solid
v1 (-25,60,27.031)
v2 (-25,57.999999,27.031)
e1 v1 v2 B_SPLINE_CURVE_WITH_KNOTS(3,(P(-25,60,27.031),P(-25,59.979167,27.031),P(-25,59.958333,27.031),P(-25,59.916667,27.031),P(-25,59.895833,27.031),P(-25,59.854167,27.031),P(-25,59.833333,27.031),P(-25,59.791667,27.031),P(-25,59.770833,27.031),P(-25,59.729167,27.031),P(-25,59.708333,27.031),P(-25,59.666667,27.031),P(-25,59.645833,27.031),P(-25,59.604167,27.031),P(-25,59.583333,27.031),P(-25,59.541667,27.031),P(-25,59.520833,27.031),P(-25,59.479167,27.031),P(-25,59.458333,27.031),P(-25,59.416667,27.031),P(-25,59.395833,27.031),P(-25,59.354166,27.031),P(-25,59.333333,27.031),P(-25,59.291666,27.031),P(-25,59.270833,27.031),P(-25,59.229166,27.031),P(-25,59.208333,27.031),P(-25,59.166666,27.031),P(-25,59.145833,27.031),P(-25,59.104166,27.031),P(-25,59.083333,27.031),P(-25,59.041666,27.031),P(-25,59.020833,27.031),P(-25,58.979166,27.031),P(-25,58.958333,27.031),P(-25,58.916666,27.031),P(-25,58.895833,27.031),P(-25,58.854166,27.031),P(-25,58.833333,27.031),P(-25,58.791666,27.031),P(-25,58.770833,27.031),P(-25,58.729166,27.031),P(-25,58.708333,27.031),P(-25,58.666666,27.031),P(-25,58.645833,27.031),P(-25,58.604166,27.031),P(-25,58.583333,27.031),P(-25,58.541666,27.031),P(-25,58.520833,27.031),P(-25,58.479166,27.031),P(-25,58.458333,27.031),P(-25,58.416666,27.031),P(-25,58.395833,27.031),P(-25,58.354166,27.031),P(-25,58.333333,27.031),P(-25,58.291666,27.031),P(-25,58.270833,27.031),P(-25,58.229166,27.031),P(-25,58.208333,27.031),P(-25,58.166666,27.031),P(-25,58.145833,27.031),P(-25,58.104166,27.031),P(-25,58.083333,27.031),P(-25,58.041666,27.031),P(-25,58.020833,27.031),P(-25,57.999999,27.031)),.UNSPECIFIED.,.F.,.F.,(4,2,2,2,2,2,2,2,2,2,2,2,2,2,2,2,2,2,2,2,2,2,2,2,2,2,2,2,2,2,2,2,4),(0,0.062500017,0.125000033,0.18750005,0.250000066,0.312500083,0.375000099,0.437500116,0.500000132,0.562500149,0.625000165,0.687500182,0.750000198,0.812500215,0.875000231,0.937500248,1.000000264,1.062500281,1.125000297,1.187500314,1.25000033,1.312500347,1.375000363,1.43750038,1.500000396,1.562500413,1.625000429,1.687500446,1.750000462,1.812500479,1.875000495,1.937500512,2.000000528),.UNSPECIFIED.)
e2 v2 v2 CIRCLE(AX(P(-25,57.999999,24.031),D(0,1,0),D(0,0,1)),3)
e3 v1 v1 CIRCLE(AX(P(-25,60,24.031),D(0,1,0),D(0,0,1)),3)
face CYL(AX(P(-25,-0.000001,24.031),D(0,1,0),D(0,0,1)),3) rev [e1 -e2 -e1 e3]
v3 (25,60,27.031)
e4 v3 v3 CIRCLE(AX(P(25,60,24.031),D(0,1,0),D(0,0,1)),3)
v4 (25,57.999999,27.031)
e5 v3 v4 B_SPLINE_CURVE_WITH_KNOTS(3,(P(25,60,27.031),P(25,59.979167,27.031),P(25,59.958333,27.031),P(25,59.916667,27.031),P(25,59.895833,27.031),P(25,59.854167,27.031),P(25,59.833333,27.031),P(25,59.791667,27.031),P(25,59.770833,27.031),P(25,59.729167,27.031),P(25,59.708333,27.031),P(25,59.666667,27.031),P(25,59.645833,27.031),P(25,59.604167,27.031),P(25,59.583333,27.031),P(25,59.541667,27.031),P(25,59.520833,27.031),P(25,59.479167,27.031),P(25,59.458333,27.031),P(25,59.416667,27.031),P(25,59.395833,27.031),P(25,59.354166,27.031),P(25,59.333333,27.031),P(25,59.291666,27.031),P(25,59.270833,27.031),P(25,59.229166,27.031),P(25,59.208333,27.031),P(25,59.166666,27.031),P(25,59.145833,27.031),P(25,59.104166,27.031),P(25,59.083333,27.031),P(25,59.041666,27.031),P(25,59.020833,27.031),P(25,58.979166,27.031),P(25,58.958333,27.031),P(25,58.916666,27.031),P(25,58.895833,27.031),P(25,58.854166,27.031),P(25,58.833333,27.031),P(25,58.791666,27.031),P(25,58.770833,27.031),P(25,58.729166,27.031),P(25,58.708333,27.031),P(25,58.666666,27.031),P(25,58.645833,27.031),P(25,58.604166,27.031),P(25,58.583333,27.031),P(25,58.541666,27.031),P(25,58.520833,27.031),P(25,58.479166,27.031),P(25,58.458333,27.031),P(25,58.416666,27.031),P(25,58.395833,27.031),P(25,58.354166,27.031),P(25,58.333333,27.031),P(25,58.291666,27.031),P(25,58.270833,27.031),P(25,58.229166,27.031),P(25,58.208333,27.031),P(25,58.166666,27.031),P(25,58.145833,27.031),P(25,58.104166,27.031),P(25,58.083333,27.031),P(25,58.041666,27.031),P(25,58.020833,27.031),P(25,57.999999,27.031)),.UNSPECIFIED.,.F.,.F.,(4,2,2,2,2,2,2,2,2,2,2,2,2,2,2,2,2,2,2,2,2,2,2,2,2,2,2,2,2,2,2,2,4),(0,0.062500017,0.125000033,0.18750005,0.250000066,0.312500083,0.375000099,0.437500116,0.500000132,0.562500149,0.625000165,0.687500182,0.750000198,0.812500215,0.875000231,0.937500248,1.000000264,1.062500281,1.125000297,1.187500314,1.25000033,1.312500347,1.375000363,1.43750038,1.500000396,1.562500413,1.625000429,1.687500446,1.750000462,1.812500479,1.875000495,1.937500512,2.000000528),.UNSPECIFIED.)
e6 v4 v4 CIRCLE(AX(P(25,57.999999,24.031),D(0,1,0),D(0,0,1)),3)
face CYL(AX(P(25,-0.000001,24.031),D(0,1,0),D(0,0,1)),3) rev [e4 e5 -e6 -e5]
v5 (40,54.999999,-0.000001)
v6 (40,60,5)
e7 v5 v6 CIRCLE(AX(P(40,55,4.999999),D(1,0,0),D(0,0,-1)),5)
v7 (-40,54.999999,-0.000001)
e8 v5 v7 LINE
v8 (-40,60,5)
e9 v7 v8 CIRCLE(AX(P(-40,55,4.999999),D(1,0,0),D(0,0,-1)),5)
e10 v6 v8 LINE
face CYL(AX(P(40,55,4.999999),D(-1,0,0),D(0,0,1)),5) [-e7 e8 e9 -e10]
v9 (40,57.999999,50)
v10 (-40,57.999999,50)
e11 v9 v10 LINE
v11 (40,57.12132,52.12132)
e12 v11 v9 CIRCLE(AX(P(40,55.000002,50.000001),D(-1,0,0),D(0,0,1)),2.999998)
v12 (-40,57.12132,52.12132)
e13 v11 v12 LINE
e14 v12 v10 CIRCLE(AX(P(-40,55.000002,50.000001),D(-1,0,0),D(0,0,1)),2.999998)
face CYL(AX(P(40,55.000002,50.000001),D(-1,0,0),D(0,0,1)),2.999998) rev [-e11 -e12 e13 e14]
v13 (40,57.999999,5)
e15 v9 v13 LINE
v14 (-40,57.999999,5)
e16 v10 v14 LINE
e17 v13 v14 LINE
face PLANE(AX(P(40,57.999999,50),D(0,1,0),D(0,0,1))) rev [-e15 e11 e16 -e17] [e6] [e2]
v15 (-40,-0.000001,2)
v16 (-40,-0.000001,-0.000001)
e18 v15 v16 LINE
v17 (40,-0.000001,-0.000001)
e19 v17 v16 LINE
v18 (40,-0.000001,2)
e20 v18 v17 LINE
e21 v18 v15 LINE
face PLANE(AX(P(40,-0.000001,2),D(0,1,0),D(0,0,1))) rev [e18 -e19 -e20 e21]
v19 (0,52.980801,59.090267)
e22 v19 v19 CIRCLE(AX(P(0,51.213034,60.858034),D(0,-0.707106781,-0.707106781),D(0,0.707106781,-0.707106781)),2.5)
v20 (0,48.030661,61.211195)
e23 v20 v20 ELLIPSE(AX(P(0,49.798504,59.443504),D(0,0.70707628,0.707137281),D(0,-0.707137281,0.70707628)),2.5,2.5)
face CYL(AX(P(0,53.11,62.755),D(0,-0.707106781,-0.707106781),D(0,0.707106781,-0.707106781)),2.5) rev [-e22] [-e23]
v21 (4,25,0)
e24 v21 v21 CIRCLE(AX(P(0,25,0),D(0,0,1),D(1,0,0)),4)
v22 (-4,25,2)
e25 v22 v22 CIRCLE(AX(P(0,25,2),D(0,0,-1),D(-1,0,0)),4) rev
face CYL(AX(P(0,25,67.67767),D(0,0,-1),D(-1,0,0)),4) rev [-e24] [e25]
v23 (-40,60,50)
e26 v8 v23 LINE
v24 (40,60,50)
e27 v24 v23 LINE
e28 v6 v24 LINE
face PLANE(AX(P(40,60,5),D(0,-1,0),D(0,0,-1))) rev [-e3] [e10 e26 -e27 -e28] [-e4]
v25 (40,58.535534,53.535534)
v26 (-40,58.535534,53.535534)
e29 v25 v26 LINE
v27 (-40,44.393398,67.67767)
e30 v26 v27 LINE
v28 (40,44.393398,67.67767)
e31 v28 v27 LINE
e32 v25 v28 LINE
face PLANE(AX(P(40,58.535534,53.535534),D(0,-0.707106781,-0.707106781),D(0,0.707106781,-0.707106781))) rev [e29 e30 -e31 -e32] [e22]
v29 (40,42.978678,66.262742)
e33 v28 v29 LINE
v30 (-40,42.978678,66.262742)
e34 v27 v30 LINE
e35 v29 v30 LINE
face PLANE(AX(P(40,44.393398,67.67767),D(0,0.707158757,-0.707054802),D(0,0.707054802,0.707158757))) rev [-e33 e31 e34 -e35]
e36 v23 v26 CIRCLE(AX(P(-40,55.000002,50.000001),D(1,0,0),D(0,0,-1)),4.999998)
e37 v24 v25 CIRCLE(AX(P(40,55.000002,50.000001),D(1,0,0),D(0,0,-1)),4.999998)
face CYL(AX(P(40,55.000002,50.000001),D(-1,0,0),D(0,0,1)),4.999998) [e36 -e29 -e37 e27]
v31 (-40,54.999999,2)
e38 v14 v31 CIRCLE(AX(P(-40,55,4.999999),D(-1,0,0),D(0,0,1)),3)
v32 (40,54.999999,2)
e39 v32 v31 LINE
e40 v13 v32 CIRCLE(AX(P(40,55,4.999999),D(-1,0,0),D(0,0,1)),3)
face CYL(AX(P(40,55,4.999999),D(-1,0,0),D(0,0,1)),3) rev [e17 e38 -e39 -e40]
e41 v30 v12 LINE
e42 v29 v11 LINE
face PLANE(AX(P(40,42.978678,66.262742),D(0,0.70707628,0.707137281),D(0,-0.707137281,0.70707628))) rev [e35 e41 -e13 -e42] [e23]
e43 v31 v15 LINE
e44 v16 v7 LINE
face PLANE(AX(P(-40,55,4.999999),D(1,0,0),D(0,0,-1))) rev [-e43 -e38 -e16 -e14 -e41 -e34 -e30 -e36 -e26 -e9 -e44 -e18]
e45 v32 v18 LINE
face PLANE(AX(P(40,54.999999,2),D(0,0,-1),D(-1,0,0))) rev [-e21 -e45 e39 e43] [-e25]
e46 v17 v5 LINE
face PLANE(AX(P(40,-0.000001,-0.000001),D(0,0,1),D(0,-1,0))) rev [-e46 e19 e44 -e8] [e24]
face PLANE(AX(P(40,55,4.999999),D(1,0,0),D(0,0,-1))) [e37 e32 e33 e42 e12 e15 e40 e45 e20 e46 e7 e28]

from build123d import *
from OCP.BRepAlgoAPI import BRepAlgoAPI_Cut
from OCP.TopTools import TopTools_ListOfShape

# Parameters (mm, degrees)
EXTRUDE_START       = -40
EXTRUDE_1_DEPTH     = 80
SKETCH_2_R          = 4
CUT_EXTRUDE_1_DEPTH = 99.895232583
SKETCH_3_R          = 3
CUT_EXTRUDE_2_DEPTH = 99.895232848
SWEEP_6_PROFILE_R   = 2.5


with BuildPart() as part:
    # 凸台-拉伸1: read off the stored shape, not the designer's step
    # 凸台-拉伸1 outline → 凸台-拉伸1 (new body)
    with BuildSketch(Plane(origin=(0, 0, 0), x_dir=(0, 0, -1), z_dir=(1, 0, 0)).offset(EXTRUDE_START)):
        with BuildLine():
            Line((-1.999999781, -5.28e-07), (8.38e-07, -5.28e-07))
            Line((8.38e-07, -5.28e-07), (8.38e-07, 54.999999472))
            ThreePointArc((8.38e-07, 54.999999472), (-1.464465344, 58.535533909), (-4.999999781, 60.000000091))
            Line((-4.999999781, 60.000000091), (-49.999999781, 60.000000091))
            ThreePointArc((-49.999999781, 60.000000091), (-51.913417169, 59.619397955), (-53.535534, 58.535534))
            Line((-53.535534, 58.535534), (-67.67767, 44.393398))
            Line((-67.67767, 44.393398), (-66.262742, 42.978678))
            Line((-66.262742, 42.978678), (-52.12132, 57.12132))
            ThreePointArc((-52.12132, 57.12132), (-51.148050068, 57.771638319), (-49.999999781, 57.999999472))
            Line((-49.999999781, 57.999999472), (-4.999999781, 57.999999472))
            ThreePointArc((-4.999999781, 57.999999472), (-2.878679344, 57.121319909), (-1.999999781, 54.999999472))
            Line((-1.999999781, 54.999999472), (-1.999999781, -5.28e-07))
        make_face()
    extrude(amount=EXTRUDE_1_DEPTH)


with BuildPart() as cut_extrude_1_tool:
    # 草图2 → 切除-拉伸1 (new, through all)
    with BuildSketch(Plane.XY):
        with Locations(Location((0, 25, 0), (0, 0, 180))):
            Circle(SKETCH_2_R)
    extrude(amount=CUT_EXTRUDE_1_DEPTH)


with BuildPart() as part_1:
    add(part.part)

    # 切除-拉伸1: cut by cut_extrude_1_tool, with a tolerance
    cut_extrude_1_stock = TopTools_ListOfShape()
    cut_extrude_1_stock.Append(part_1.part.wrapped)
    cut_extrude_1_tools = TopTools_ListOfShape()
    cut_extrude_1_tools.Append(cut_extrude_1_tool.part.wrapped)
    cut_extrude_1_cut = BRepAlgoAPI_Cut()
    cut_extrude_1_cut.SetArguments(cut_extrude_1_stock)
    cut_extrude_1_cut.SetTools(cut_extrude_1_tools)
    cut_extrude_1_cut.SetFuzzyValue(0.00001)
    cut_extrude_1_cut.Build()
    add(Compound.cast(cut_extrude_1_cut.Shape()).solids(), mode=Mode.REPLACE)

    # 草图3 → 切除-拉伸2 (cut, through all)
    with BuildSketch(Plane(origin=(0, 60, 0), x_dir=(1, 0, 0), z_dir=(0, 1, 0))):
        with Locations(Location((-25, -24.031, 0), (0, 0, 270))):
            Circle(SKETCH_3_R)
        with Locations(Location((25, -24.031, 0), (0, 0, 270))):
            Circle(SKETCH_3_R)
    extrude(amount=-CUT_EXTRUDE_2_DEPTH, mode=Mode.SUBTRACT)

    # 切除-扫描6: sweep along a curve in space
    with BuildLine() as sweep_6_path:
        Line((0, 53.11, 62.755), (0, 46.038932, 55.683932))
    # 切除-扫描6 profile (on start of the path) → 切除-扫描6 (sweep, cut)
    with BuildSketch(Plane(origin=(0, 53.11, 62.755), x_dir=(0, -0.7071067811865479, 0.7071067811865471), z_dir=(0, -0.7071067811865471, -0.7071067811865479))):
        Circle(SWEEP_6_PROFILE_R)
    sweep(path=sweep_6_path.line, mode=Mode.SUBTRACT)


solid = part_1.part
